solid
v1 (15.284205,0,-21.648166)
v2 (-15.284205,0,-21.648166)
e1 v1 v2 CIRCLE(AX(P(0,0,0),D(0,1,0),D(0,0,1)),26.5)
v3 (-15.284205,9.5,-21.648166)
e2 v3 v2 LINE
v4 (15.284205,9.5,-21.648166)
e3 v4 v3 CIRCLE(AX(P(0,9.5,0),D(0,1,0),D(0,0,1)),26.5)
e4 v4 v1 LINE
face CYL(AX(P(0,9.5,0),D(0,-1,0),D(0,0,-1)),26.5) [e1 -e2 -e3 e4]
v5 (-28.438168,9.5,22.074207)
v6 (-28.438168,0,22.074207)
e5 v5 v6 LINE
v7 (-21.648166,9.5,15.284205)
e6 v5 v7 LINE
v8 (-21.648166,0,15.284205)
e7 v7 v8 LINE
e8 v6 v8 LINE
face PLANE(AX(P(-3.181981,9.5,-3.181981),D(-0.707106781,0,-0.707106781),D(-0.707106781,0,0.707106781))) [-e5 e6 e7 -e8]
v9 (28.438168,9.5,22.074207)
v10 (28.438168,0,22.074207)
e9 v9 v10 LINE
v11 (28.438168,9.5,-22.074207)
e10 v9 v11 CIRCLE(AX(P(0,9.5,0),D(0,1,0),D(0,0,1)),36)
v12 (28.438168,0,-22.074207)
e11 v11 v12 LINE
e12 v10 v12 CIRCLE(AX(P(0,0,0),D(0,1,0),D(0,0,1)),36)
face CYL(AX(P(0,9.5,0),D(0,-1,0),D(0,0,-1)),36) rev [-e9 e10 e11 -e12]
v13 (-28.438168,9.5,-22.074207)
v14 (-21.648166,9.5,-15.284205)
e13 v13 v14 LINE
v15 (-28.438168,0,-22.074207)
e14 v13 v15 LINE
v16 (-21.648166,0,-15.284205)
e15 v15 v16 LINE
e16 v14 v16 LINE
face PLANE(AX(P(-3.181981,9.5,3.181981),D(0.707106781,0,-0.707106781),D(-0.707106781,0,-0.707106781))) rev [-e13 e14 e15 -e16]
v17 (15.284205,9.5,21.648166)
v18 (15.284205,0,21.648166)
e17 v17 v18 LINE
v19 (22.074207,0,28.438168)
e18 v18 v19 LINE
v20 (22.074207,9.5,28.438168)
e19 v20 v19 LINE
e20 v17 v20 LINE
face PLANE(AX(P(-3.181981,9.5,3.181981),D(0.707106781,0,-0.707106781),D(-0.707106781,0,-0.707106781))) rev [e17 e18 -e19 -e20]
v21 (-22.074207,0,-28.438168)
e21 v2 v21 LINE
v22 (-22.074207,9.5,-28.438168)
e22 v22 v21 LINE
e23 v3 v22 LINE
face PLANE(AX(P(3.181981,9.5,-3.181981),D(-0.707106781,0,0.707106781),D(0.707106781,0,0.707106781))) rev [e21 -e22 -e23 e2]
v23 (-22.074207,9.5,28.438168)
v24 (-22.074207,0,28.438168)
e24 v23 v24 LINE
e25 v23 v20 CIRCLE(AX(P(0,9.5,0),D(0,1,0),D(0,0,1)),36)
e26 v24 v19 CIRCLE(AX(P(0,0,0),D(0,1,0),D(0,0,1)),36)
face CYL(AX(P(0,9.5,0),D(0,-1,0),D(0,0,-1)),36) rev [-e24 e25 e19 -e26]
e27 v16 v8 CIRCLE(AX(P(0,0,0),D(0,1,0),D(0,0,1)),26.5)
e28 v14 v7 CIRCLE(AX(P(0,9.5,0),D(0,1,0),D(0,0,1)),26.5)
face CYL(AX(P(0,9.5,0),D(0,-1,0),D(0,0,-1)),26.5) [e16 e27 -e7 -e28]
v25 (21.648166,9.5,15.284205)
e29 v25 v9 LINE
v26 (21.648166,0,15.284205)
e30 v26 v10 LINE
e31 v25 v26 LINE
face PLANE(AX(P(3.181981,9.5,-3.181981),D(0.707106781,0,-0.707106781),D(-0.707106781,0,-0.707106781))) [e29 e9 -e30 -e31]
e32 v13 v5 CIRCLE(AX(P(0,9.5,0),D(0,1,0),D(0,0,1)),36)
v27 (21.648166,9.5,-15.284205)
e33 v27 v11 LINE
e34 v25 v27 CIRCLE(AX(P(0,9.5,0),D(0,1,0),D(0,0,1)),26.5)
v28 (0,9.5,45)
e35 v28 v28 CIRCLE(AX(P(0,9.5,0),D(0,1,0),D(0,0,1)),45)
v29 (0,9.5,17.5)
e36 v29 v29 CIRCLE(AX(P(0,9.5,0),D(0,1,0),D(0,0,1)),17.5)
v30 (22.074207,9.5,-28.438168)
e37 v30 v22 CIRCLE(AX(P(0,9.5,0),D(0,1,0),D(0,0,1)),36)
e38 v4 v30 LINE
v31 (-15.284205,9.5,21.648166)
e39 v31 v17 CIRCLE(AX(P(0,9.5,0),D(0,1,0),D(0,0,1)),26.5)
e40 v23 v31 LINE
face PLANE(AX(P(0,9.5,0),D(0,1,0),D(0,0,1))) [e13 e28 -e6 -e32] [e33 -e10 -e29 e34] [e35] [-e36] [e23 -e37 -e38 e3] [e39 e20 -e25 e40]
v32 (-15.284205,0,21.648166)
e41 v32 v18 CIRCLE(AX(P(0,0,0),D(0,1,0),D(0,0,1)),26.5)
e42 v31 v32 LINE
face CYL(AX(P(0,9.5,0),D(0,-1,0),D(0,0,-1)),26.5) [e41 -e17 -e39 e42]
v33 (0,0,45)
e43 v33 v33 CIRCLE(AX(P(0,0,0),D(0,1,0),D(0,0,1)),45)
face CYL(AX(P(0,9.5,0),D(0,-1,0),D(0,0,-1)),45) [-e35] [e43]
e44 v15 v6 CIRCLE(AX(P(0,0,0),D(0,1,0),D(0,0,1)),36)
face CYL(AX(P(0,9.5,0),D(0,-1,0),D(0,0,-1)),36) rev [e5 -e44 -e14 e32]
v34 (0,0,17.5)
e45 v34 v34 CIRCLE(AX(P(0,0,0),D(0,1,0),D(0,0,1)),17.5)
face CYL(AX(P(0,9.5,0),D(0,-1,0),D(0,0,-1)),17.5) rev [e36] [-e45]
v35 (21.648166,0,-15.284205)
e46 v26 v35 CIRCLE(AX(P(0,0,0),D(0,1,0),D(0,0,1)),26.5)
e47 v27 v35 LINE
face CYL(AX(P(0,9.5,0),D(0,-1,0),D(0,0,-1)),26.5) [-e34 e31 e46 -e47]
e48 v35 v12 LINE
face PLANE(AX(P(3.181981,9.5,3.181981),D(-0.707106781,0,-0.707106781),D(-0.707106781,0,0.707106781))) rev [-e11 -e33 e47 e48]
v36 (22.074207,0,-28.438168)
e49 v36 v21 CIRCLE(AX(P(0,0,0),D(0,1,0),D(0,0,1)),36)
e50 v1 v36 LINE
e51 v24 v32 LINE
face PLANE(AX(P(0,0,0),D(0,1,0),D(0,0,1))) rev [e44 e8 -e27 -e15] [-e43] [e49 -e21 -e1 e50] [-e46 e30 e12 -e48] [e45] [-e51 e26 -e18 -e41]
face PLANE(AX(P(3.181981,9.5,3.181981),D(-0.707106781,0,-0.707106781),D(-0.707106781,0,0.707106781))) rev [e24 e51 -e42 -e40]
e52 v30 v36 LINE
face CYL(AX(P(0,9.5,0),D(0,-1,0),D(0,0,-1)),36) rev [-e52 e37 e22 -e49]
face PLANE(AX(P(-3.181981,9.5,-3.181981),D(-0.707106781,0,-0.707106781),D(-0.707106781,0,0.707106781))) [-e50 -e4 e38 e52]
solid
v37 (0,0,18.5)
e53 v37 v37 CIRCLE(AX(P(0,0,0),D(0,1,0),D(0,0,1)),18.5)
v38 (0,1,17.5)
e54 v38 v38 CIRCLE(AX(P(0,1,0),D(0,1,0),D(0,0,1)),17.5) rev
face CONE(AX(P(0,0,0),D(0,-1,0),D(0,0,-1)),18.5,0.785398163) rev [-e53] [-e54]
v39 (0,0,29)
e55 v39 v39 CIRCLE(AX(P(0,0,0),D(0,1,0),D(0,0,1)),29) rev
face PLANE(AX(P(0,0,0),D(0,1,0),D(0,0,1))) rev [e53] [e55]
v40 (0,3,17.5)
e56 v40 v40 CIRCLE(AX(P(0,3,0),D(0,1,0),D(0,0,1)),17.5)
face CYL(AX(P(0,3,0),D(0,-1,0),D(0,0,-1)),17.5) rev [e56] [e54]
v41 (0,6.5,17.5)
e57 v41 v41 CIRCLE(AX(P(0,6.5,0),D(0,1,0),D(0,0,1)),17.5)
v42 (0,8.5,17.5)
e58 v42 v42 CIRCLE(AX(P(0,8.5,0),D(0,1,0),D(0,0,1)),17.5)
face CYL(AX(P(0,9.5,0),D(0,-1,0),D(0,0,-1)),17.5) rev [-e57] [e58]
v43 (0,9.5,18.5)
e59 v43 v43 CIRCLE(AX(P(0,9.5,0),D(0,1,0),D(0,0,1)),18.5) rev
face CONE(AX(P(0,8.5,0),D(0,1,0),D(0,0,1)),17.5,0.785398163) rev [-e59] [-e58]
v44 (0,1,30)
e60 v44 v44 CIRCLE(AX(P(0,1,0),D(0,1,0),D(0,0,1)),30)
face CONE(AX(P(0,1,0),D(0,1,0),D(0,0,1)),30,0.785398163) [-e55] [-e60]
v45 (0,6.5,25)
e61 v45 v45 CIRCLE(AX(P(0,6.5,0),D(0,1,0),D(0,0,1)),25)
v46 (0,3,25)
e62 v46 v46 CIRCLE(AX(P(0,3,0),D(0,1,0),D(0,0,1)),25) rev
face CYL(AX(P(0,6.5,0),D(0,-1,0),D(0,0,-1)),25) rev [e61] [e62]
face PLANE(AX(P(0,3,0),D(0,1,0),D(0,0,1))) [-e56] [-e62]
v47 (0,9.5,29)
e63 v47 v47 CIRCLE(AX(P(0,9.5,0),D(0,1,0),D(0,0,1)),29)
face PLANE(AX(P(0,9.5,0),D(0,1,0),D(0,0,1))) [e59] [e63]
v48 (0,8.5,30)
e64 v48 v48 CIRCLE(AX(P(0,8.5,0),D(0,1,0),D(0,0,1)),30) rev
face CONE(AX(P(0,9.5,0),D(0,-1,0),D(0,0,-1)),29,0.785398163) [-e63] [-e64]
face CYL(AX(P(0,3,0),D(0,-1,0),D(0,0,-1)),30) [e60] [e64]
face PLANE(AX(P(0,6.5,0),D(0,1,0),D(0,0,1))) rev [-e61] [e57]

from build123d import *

# Parameters (mm, degrees)
SKETCH2_R           = 45
SKETCH2_R_2         = 36
SKETCH2_R_3         = 26.5
SKETCH2_R_4         = 17.5
BOSS_EXTRUDE2_DEPTH = 9.5
SKETCH4_R           = 30
SKETCH4_R_2         = 17.5
BOSS_EXTRUDE3_DEPTH = 3
SKETCH5_R           = 30
SKETCH5_R_2         = 25
BOSS_EXTRUDE4_DEPTH = 3.5
SKETCH7_R           = 30
SKETCH7_R_2         = 17.5
BOSS_EXTRUDE5_DEPTH = 3
CHAMFER1_SIZE       = 1
CHAMFER2_SIZE       = 1
CHAMFER3_SIZE       = 1
CHAMFER4_SIZE       = 1


with BuildPart() as part:
    # Sketch2 → Boss-Extrude2 (new body)
    # profile 1 of 6: a face of its own
    with BuildSketch(Plane(origin=(0, 0, 0), x_dir=(1, 0, 0), z_dir=(0, 1, 0))):
        with Locations(Location((0, 0, 0), (0, 0, 270))):
            Circle(SKETCH2_R)
        Circle(SKETCH2_R_2, mode=Mode.SUBTRACT)
    # profile 2 of 6: a face of its own
    with BuildSketch(Plane(origin=(0, 0, 0), x_dir=(1, 0, 0), z_dir=(0, 1, 0))):
        with BuildLine():
            Line((22.074206845, 28.438167876), (15.284204797, 21.648165828))
            ThreePointArc((15.284204797, 21.648165828), (18.738329701, 18.738329701), (21.648165828, 15.284204797))
            Line((21.648165828, 15.284204797), (28.438167876, 22.074206845))
            ThreePointArc((28.438167876, 22.074206845), (25.455844123, 25.455844123), (22.074206845, 28.438167876))
        make_face()
    # profile 3 of 6: a face of its own
    with BuildSketch(Plane(origin=(0, 0, 0), x_dir=(1, 0, 0), z_dir=(0, 1, 0))):
        with BuildLine():
            Line((28.438167876, -22.074206845), (21.648165828, -15.284204797))
            ThreePointArc((21.648165828, -15.284204797), (18.738329701, -18.738329701), (15.284204797, -21.648165828))
            Line((15.284204797, -21.648165828), (22.074206845, -28.438167876))
            ThreePointArc((22.074206845, -28.438167876), (25.455844123, -25.455844123), (28.438167876, -22.074206845))
        make_face()
    # profile 4 of 6: a face of its own
    with BuildSketch(Plane(origin=(0, 0, 0), x_dir=(1, 0, 0), z_dir=(0, 1, 0))):
        with BuildLine():
            ThreePointArc((-15.284204797, -21.648165828), (-18.738329701, -18.738329701), (-21.648165828, -15.284204797))
            Line((-21.648165828, -15.284204797), (-28.438167876, -22.074206845))
            ThreePointArc((-28.438167876, -22.074206845), (-25.455844123, -25.455844123), (-22.074206845, -28.438167876))
            Line((-22.074206845, -28.438167876), (-15.284204797, -21.648165828))
        make_face()
    # profile 5 of 6: a face of its own
    with BuildSketch(Plane(origin=(0, 0, 0), x_dir=(1, 0, 0), z_dir=(0, 1, 0))):
        with BuildLine():
            ThreePointArc((-21.648165828, 15.284204797), (-18.738329701, 18.738329701), (-15.284204797, 21.648165828))
            Line((-15.284204797, 21.648165828), (-22.074206845, 28.438167876))
            ThreePointArc((-22.074206845, 28.438167876), (-25.455844123, 25.455844123), (-28.438167876, 22.074206845))
            Line((-28.438167876, 22.074206845), (-21.648165828, 15.284204797))
        make_face()
    # profile 6 of 6: a face of its own
    with BuildSketch(Plane(origin=(0, 0, 0), x_dir=(1, 0, 0), z_dir=(0, 1, 0))):
        Circle(SKETCH2_R_3)
        with Locations(Location((0, 0, 0), (0, 0, 270))):
            Circle(SKETCH2_R_4, mode=Mode.SUBTRACT)
    extrude(amount=BOSS_EXTRUDE2_DEPTH)


with BuildPart() as body_2:
    # Sketch4 → Boss-Extrude3 (new body)
    with BuildSketch(Plane(origin=(0, 0, 0), x_dir=(1, 0, 0), z_dir=(0, 1, 0))):
        with Locations(Location((0, 0, 0), (0, 0, 270))):
            Circle(SKETCH4_R)
        with Locations(Location((0, 0, 0), (0, 0, 270))):
            Circle(SKETCH4_R_2, mode=Mode.SUBTRACT)
    extrude(amount=BOSS_EXTRUDE3_DEPTH)

    # Sketch5 → Boss-Extrude4 (add)
    with BuildSketch(Plane(origin=(0, 3, 0), x_dir=(1, 0, 0), z_dir=(0, 1, 0))):
        with Locations(Location((0, 0, 0), (0, 0, 270))):
            Circle(SKETCH5_R)
        with Locations(Location((0, 0, 0), (0, 0, 270))):
            Circle(SKETCH5_R_2, mode=Mode.SUBTRACT)
    extrude(amount=BOSS_EXTRUDE4_DEPTH)

    # Sketch7 → Boss-Extrude5 (add)
    with BuildSketch(Plane(origin=(0, 6.5, 0), x_dir=(1, 0, 0), z_dir=(0, 1, 0))):
        with Locations(Location((0, 0, 0), (0, 0, 270))):
            Circle(SKETCH7_R)
        with Locations(Location((0, 0, 0), (0, 0, 270))):
            Circle(SKETCH7_R_2, mode=Mode.SUBTRACT)
    extrude(amount=BOSS_EXTRUDE5_DEPTH)

    # Chamfer1
    chamfer1_edges = [body_2.edges().sort_by_distance(p)[0] for p in [
        (0, 9.5, -30),
    ]]
    chamfer(chamfer1_edges, length=CHAMFER1_SIZE)

    # Chamfer2
    chamfer2_edges = [body_2.edges().sort_by_distance(p)[0] for p in [
        (0, 0, -30),
    ]]
    chamfer(chamfer2_edges, length=CHAMFER2_SIZE)

    # Chamfer3
    chamfer3_edges = [body_2.edges().sort_by_distance(p)[0] for p in [
        (0, 0, -17.5),
    ]]
    chamfer(chamfer3_edges, length=CHAMFER3_SIZE)

    # Chamfer4
    chamfer4_edges = [body_2.edges().sort_by_distance(p)[0] for p in [
        (0, 9.5, -17.5),
    ]]
    chamfer(chamfer4_edges, length=CHAMFER4_SIZE)


solid = Compound([part.part, body_2.part])
